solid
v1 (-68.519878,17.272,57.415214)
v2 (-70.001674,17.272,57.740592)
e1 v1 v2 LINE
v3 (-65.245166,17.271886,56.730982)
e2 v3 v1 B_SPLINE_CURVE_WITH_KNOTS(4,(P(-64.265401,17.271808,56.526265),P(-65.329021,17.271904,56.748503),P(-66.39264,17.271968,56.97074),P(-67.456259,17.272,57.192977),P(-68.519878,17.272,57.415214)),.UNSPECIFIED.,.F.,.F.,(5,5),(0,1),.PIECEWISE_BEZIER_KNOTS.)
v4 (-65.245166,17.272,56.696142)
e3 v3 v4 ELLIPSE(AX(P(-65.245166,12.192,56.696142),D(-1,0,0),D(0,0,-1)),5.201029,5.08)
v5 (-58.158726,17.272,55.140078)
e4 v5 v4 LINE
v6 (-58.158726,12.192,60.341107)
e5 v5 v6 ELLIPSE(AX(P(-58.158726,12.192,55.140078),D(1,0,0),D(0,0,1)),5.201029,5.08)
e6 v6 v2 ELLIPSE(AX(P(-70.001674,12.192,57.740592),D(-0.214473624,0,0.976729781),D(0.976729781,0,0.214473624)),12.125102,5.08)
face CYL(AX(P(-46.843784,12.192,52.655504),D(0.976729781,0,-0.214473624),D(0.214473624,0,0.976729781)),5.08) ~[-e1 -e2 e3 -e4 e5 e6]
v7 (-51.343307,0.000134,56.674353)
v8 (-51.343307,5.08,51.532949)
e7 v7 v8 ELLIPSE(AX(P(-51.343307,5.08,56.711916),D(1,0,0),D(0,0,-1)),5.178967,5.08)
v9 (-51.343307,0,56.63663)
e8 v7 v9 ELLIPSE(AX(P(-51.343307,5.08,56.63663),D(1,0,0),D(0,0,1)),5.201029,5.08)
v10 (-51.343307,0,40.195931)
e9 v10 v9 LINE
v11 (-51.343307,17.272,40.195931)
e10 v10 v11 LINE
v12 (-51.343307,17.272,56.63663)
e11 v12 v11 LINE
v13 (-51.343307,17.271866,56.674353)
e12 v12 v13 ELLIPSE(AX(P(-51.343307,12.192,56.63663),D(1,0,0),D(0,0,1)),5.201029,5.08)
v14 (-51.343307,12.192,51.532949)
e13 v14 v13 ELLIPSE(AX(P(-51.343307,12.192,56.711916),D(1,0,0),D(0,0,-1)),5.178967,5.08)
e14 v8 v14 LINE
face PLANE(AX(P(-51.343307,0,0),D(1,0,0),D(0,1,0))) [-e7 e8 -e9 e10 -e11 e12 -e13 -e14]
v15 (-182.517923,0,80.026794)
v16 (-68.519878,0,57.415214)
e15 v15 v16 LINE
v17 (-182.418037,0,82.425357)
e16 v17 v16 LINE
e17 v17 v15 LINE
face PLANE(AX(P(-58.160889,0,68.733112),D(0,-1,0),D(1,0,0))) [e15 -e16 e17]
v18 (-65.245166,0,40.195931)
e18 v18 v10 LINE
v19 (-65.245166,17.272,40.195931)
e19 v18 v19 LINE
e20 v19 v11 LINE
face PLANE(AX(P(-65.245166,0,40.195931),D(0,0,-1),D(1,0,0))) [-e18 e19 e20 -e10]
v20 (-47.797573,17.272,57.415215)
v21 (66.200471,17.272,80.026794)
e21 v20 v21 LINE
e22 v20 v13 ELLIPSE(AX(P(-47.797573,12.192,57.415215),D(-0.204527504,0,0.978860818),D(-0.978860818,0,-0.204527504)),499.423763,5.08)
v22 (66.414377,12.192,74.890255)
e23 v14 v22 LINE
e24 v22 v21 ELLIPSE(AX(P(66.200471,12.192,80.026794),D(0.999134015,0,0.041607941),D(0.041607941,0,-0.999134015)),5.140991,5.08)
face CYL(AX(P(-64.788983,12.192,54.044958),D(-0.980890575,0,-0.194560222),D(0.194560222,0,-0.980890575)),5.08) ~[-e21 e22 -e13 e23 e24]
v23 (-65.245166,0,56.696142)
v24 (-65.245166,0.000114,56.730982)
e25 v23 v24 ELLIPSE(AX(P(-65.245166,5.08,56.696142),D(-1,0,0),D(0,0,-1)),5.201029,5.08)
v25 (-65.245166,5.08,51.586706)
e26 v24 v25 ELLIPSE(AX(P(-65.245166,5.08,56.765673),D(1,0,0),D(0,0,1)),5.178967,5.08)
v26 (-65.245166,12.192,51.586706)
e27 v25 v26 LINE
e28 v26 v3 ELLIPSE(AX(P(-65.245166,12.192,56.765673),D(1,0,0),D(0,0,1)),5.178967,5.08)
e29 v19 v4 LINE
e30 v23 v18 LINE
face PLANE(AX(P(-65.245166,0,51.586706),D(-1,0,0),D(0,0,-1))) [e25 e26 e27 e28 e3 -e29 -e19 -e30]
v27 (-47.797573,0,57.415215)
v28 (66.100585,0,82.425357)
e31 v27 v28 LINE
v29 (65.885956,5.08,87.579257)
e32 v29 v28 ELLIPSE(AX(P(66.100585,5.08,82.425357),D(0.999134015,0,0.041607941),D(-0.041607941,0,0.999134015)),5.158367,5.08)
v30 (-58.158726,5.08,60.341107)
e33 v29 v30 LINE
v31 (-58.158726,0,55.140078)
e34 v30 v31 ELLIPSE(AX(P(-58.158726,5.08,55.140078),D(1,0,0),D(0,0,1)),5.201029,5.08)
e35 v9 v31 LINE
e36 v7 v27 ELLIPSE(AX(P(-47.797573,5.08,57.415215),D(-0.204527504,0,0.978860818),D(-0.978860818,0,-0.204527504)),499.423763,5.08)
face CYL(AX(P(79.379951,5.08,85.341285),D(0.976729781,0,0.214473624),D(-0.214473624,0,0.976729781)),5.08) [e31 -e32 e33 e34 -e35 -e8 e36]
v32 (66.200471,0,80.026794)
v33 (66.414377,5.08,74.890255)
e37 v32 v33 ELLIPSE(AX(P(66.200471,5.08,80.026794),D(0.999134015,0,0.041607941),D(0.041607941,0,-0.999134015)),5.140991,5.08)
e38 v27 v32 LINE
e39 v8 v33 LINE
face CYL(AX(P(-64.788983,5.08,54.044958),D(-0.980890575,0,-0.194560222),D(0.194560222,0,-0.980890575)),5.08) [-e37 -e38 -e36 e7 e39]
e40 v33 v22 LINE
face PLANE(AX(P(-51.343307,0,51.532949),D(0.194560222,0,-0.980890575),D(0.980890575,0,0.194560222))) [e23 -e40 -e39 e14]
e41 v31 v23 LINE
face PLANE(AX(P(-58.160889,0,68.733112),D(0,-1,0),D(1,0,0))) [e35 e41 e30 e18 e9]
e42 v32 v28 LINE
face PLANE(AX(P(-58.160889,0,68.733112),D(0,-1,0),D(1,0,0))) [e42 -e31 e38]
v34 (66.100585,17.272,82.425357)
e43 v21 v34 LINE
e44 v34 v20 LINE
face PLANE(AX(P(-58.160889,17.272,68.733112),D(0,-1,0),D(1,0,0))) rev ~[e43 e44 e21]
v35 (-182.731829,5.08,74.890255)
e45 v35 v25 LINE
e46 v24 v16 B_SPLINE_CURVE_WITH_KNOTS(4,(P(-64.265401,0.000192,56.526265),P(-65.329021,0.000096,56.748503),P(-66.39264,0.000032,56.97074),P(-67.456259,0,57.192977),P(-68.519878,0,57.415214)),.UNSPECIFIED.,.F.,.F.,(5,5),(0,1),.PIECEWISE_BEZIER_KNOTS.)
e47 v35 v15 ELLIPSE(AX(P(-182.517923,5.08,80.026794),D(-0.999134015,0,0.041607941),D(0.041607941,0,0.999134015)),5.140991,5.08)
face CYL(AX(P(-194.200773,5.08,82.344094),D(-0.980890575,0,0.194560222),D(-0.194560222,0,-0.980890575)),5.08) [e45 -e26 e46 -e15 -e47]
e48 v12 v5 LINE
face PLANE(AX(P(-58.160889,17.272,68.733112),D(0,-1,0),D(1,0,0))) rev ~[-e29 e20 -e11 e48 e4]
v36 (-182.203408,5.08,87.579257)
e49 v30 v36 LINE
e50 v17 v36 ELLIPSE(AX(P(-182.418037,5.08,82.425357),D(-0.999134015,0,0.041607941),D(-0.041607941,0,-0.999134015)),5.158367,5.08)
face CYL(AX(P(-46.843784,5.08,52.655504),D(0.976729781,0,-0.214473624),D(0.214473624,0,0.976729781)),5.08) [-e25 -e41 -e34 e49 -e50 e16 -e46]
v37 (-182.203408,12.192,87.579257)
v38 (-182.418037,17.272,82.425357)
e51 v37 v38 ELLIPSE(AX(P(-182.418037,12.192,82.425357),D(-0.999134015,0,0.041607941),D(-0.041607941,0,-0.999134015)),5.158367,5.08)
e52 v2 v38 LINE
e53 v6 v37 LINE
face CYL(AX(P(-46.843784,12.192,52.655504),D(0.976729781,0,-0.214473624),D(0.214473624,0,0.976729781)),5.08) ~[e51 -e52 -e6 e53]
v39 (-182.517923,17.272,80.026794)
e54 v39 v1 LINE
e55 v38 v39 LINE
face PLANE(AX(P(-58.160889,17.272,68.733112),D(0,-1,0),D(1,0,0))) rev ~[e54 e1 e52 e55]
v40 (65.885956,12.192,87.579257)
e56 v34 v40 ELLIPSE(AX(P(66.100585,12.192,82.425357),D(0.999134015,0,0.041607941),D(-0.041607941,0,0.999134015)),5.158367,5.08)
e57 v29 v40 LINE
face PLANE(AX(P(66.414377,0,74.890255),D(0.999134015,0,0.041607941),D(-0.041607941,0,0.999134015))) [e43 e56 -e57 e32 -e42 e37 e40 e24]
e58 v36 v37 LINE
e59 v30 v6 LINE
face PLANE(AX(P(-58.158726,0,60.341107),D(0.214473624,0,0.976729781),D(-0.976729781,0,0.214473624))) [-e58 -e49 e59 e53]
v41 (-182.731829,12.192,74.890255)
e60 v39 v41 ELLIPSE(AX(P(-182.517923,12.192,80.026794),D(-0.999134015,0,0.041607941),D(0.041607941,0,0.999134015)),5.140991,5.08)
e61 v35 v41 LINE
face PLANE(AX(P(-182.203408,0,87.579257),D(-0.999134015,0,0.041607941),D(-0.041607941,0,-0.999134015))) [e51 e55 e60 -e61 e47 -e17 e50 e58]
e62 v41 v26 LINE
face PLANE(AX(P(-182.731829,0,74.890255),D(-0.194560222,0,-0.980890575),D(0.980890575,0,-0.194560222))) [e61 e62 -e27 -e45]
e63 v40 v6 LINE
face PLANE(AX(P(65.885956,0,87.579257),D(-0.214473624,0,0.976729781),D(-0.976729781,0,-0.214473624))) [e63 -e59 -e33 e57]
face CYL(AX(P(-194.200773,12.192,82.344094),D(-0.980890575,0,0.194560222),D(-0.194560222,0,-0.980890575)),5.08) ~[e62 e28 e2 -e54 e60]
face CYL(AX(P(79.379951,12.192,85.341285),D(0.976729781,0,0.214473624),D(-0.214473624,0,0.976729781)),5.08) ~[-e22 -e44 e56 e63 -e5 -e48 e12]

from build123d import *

# Parameters (mm, degrees)
F1_DEPTH     = 17.272
F2_T4_DEPTH  = 145.1755034497
F2_T9_DEPTH  = 145.1755034497
F2_T14_DEPTH = 145.451805042
F2_T19_DEPTH = 145.451805042
F2_T24_DEPTH = 152.4
F2_T29_DEPTH = 152.4
F2_T34_DEPTH = 152.4
F2_T39_DEPTH = 152.4
F2_T45_DEPTH = 152.4
F2_T49_DEPTH = 152.4
F2_T56_DEPTH = 152.4
F2_T60_DEPTH = 152.4


# Not quite as in the source:
# - a fillet or chamfer that OpenCascade refuses, or shapes differently, is made with other operations: its cross-section is extruded or revolved along the edge and cut away or added


with BuildPart() as f1:
    # F0 (on Front) → F1 (new body)
    with BuildSketch(Plane.XZ):
        Polygon((-58.1587258462, 60.3411067049), (-182.2034080142, 87.5792568958), (-182.731828862, 74.8902549096), (-65.2451664209, 51.5867063582), (-65.2451664209, 57.4221499264), (-51.3433068991, 57.4221499264), (-51.3433068991, 51.5329490591), (66.4143771697, 74.8902549096), (65.8859563219, 87.5792568958), align=None)
        Polygon((-65.2451664209, 57.4221499264), (-65.2451664209, 51.5867063582), (-58.1587258462, 50.1811067049), (-51.3433068991, 51.5329490591), (-51.3433068991, 57.4221499264), align=None)
        Polygon((-58.1587258462, 50.1811067049), (-65.2451664209, 51.5867063582), (-65.2451664209, 40.1959307492), (-51.3433068991, 40.1959307492), (-51.3433068991, 51.5329490591), align=None)
    extrude(amount=-F1_DEPTH)

    # F2: fillet of radius 5.08 on 8 edges, made by hand


with BuildPart() as f2_tool2:
    # F2_s3 → F2_t4 (new body)
    with BuildSketch(Plane(origin=(-202.5642945881, 0, 40.1787468945), x_dir=(0, 1, 0), z_dir=(0.9808905749, 0, -0.1945602221))):
        with BuildLine():
            ThreePointArc((12.192, 37.9067999896), (15.7841024484, 39.3946975412), (17.272, 42.9867999896))
            Line((17.272, 42.9867999896), (17.272, 37.9067999896))
            Line((17.272, 37.9067999896), (12.192, 37.9067999896))
        make_face()
    extrude(amount=F2_T4_DEPTH)

    split(bisect_by=Plane.YZ.offset(-65.2451664209), keep=Keep.BOTTOM)


with BuildPart() as f1_1:
    add(f1.part)

    # F2_t1: cut F2_tool2
    add(f2_tool2.part, mode=Mode.SUBTRACT)


with BuildPart() as f2_tool7:
    # F2_s8 → F2_t9 (new body)
    with BuildSketch(Plane(origin=(-202.5642945881, 0, 40.1787468945), x_dir=(0, 1, 0), z_dir=(0.9808905749, 0, -0.1945602221))):
        with BuildLine():
            ThreePointArc((5.08, 37.9067999896), (1.4878975516, 39.3946975412), (0, 42.9867999896))
            Line((0, 42.9867999896), (0, 37.9067999896))
            Line((0, 37.9067999896), (5.08, 37.9067999896))
        make_face()
    extrude(amount=F2_T9_DEPTH)

    split(bisect_by=Plane.YZ.offset(-65.2451664209), keep=Keep.BOTTOM)


with BuildPart() as f1_2:
    add(f1_1.part)

    # F2_t6: cut F2_tool7
    add(f2_tool7.part, mode=Mode.SUBTRACT)


with BuildPart() as f2_tool12:
    # F2_s13 → F2_t14 (new body)
    with BuildSketch(Plane(origin=(-52.0224181794, 0, -10.3186772236), x_dir=(0, 1, 0), z_dir=(0.9808905749, 0, 0.1945602221))):
        with BuildLine():
            ThreePointArc((12.192, 60.5375492231), (15.7841024484, 62.0254467746), (17.272, 65.6175492231))
            Line((17.272, 65.6175492231), (17.272, 60.5375492231))
            Line((17.272, 60.5375492231), (12.192, 60.5375492231))
        make_face()
    extrude(amount=F2_T14_DEPTH)

    split(bisect_by=Plane.YZ.offset(-51.3433068991), keep=Keep.TOP)


with BuildPart() as f1_3:
    add(f1_2.part)

    # F2_t11: cut F2_tool12
    add(f2_tool12.part, mode=Mode.SUBTRACT)


with BuildPart() as f2_tool17:
    # F2_s18 → F2_t19 (new body)
    with BuildSketch(Plane(origin=(-52.0224181794, 0, -10.3186772236), x_dir=(0, 1, 0), z_dir=(0.9808905749, 0, 0.1945602221))):
        with BuildLine():
            ThreePointArc((5.08, 60.5375492231), (1.4878975516, 62.0254467746), (0, 65.6175492231))
            Line((0, 65.6175492231), (0, 60.5375492231))
            Line((0, 60.5375492231), (5.08, 60.5375492231))
        make_face()
    extrude(amount=F2_T19_DEPTH)

    split(bisect_by=Plane.YZ.offset(-51.3433068991), keep=Keep.TOP)


with BuildPart() as f1_4:
    add(f1_3.part)

    # F2_t16: cut F2_tool17
    add(f2_tool17.part, mode=Mode.SUBTRACT)


with BuildPart() as f2_tool22:
    # F2_s23 → F2_t24 (new body)
    with BuildSketch(Plane(origin=(-55.7194406669, 0, 12.2350629379), x_dir=(0, 1, 0), z_dir=(-0.9767297809, 0, 0.2144736236))):
        with BuildLine():
            ThreePointArc((12.192, -46.4634432549), (15.7841024484, -44.9755457034), (17.272, -41.3834432549))
            Line((17.272, -41.3834432549), (17.272, -46.4634432549))
            Line((17.272, -46.4634432549), (12.192, -46.4634432549))
        make_face()
    extrude(amount=F2_T24_DEPTH)

    split(bisect_by=Plane(origin=(-15.3156619604, 0, 69.7487313476), x_dir=(0, 1, 0), z_dir=(-0.2144736236, 0, 0.9767297809)), keep=Keep.TOP)


with BuildPart() as f1_5:
    add(f1_4.part)

    # F2_t21: cut F2_tool22
    add(f2_tool22.part, mode=Mode.SUBTRACT)


with BuildPart() as f2_tool27:
    # F2_s28 → F2_t29 (new body)
    with BuildSketch(Plane(origin=(-55.7194406669, 0, 12.2350629379), x_dir=(0, 1, 0), z_dir=(-0.9767297809, 0, 0.2144736236))):
        with BuildLine():
            ThreePointArc((5.08, -46.4634432549), (1.4878975516, -44.9755457034), (0, -41.3834432549))
            Line((0, -41.3834432549), (0, -46.4634432549))
            Line((0, -46.4634432549), (5.08, -46.4634432549))
        make_face()
    extrude(amount=F2_T29_DEPTH)

    split(bisect_by=Plane(origin=(-15.3156619604, 0, 69.7487313476), x_dir=(0, 1, 0), z_dir=(-0.2144736236, 0, 0.9767297809)), keep=Keep.TOP)


with BuildPart() as f1_6:
    add(f1_5.part)

    # F2_t26: cut F2_tool27
    add(f2_tool27.part, mode=Mode.SUBTRACT)


with BuildPart() as f2_tool32:
    # F2_s33 → F2_t34 (new body)
    with BuildSketch(Plane(origin=(93.6060864991, 0, 20.5543405673), x_dir=(0, 1, 0), z_dir=(-0.9767297809, 0, -0.2144736236))):
        with BuildLine():
            ThreePointArc((5.08, -71.4104686015), (1.4878975516, -69.92257105), (0, -66.3304686015))
            Line((0, -66.3304686015), (0, -71.4104686015))
            Line((0, -71.4104686015), (5.08, -71.4104686015))
        make_face()
    extrude(amount=F2_T34_DEPTH)

    split(bisect_by=Plane(origin=(9.9651830375, 0, 45.382228748), x_dir=(0, 1, 0), z_dir=(0.2144736236, 0, 0.9767297809)), keep=Keep.TOP)


with BuildPart() as f1_7:
    add(f1_6.part)

    # F2_t31: cut F2_tool32
    add(f2_tool32.part, mode=Mode.SUBTRACT)


with BuildPart() as f2_tool37:
    # F2_s38 → F2_t39 (new body)
    with BuildSketch(Plane(origin=(93.6060864991, 0, 20.5543405673), x_dir=(0, 1, 0), z_dir=(-0.9767297809, 0, -0.2144736236))):
        with BuildLine():
            ThreePointArc((12.192, -71.4104686015), (15.7841024484, -69.92257105), (17.272, -66.3304686015))
            Line((17.272, -66.3304686015), (17.272, -71.4104686015))
            Line((17.272, -71.4104686015), (12.192, -71.4104686015))
        make_face()
    extrude(amount=F2_T39_DEPTH)

    split(bisect_by=Plane(origin=(9.9651830375, 0, 45.382228748), x_dir=(0, 1, 0), z_dir=(0.2144736236, 0, 0.9767297809)), keep=Keep.TOP)


with BuildPart() as f1_8:
    add(f1_7.part)

    # F2_t36: cut F2_tool37
    add(f2_tool37.part, mode=Mode.SUBTRACT)


with BuildPart() as f2_tool43:
    # F2_s44 → F2_t45 (new body)
    with BuildSketch(Plane(origin=(93.6060864991, 0, 20.5543405673), x_dir=(0, 1, 0), z_dir=(-0.9767297809, 0, -0.2144736236))):
        with BuildLine():
            ThreePointArc((12.192, -71.4104686015), (15.7841024484, -69.92257105), (17.272, -66.3304686015))
            Line((17.272, -66.3304686015), (17.272, -71.4104686015))
            Line((17.272, -71.4104686015), (12.192, -71.4104686015))
        make_face()
    extrude(amount=F2_T45_DEPTH)

    split(bisect_by=Plane(origin=(9.9651830375, 0, 45.382228748), x_dir=(0, 1, 0), z_dir=(-0.2144736236, 0, -0.9767297809)), keep=Keep.TOP)


with BuildPart() as f2_tool47:
    # F2_s48 → F2_t49 (new body)
    with BuildSketch(Plane(origin=(-55.7194406669, 0, 12.2350629379), x_dir=(0, 1, 0), z_dir=(-0.9767297809, 0, 0.2144736236))):
        with BuildLine():
            ThreePointArc((12.192, -46.4634432549), (15.7841024484, -44.9755457034), (17.272, -41.3834432549))
            Line((17.272, -41.3834432549), (17.272, -46.4634432549))
            Line((17.272, -46.4634432549), (12.192, -46.4634432549))
        make_face()
    extrude(amount=F2_T49_DEPTH)

    split(bisect_by=Plane(origin=(-15.3156619604, 0, 69.7487313476), x_dir=(0, 1, 0), z_dir=(0.2144736236, 0, -0.9767297809)), keep=Keep.TOP)


with BuildPart() as f2_tool43_1:
    add(f2_tool43.part)

    # F2_t51: intersect F2_tool47
    add(f2_tool47.part, mode=Mode.INTERSECT)


with BuildPart() as f1_9:
    add(f1_8.part)

    # F2_t41: cut F2_tool43
    add(f2_tool43_1.part, mode=Mode.SUBTRACT)


with BuildPart() as f2_tool54:
    # F2_s55 → F2_t56 (new body)
    with BuildSketch(Plane(origin=(93.6060864991, 0, 20.5543405673), x_dir=(0, 1, 0), z_dir=(-0.9767297809, 0, -0.2144736236))):
        with BuildLine():
            ThreePointArc((5.08, -71.4104686015), (1.4878975516, -69.92257105), (0, -66.3304686015))
            Line((0, -66.3304686015), (0, -71.4104686015))
            Line((0, -71.4104686015), (5.08, -71.4104686015))
        make_face()
    extrude(amount=F2_T56_DEPTH)

    split(bisect_by=Plane(origin=(9.9651830375, 0, 45.382228748), x_dir=(0, 1, 0), z_dir=(-0.2144736236, 0, -0.9767297809)), keep=Keep.TOP)


with BuildPart() as f2_tool58:
    # F2_s59 → F2_t60 (new body)
    with BuildSketch(Plane(origin=(-55.7194406669, 0, 12.2350629379), x_dir=(0, 1, 0), z_dir=(-0.9767297809, 0, 0.2144736236))):
        with BuildLine():
            ThreePointArc((5.08, -46.4634432549), (1.4878975516, -44.9755457034), (0, -41.3834432549))
            Line((0, -41.3834432549), (0, -46.4634432549))
            Line((0, -46.4634432549), (5.08, -46.4634432549))
        make_face()
    extrude(amount=F2_T60_DEPTH)

    split(bisect_by=Plane(origin=(-15.3156619604, 0, 69.7487313476), x_dir=(0, 1, 0), z_dir=(0.2144736236, 0, -0.9767297809)), keep=Keep.TOP)


with BuildPart() as f2_tool54_1:
    add(f2_tool54.part)

    # F2_t62: intersect F2_tool58
    add(f2_tool58.part, mode=Mode.INTERSECT)


with BuildPart() as f1_10:
    add(f1_9.part)

    # F2_t52: cut F2_tool54
    add(f2_tool54_1.part, mode=Mode.SUBTRACT)


solid = f1_10.part
